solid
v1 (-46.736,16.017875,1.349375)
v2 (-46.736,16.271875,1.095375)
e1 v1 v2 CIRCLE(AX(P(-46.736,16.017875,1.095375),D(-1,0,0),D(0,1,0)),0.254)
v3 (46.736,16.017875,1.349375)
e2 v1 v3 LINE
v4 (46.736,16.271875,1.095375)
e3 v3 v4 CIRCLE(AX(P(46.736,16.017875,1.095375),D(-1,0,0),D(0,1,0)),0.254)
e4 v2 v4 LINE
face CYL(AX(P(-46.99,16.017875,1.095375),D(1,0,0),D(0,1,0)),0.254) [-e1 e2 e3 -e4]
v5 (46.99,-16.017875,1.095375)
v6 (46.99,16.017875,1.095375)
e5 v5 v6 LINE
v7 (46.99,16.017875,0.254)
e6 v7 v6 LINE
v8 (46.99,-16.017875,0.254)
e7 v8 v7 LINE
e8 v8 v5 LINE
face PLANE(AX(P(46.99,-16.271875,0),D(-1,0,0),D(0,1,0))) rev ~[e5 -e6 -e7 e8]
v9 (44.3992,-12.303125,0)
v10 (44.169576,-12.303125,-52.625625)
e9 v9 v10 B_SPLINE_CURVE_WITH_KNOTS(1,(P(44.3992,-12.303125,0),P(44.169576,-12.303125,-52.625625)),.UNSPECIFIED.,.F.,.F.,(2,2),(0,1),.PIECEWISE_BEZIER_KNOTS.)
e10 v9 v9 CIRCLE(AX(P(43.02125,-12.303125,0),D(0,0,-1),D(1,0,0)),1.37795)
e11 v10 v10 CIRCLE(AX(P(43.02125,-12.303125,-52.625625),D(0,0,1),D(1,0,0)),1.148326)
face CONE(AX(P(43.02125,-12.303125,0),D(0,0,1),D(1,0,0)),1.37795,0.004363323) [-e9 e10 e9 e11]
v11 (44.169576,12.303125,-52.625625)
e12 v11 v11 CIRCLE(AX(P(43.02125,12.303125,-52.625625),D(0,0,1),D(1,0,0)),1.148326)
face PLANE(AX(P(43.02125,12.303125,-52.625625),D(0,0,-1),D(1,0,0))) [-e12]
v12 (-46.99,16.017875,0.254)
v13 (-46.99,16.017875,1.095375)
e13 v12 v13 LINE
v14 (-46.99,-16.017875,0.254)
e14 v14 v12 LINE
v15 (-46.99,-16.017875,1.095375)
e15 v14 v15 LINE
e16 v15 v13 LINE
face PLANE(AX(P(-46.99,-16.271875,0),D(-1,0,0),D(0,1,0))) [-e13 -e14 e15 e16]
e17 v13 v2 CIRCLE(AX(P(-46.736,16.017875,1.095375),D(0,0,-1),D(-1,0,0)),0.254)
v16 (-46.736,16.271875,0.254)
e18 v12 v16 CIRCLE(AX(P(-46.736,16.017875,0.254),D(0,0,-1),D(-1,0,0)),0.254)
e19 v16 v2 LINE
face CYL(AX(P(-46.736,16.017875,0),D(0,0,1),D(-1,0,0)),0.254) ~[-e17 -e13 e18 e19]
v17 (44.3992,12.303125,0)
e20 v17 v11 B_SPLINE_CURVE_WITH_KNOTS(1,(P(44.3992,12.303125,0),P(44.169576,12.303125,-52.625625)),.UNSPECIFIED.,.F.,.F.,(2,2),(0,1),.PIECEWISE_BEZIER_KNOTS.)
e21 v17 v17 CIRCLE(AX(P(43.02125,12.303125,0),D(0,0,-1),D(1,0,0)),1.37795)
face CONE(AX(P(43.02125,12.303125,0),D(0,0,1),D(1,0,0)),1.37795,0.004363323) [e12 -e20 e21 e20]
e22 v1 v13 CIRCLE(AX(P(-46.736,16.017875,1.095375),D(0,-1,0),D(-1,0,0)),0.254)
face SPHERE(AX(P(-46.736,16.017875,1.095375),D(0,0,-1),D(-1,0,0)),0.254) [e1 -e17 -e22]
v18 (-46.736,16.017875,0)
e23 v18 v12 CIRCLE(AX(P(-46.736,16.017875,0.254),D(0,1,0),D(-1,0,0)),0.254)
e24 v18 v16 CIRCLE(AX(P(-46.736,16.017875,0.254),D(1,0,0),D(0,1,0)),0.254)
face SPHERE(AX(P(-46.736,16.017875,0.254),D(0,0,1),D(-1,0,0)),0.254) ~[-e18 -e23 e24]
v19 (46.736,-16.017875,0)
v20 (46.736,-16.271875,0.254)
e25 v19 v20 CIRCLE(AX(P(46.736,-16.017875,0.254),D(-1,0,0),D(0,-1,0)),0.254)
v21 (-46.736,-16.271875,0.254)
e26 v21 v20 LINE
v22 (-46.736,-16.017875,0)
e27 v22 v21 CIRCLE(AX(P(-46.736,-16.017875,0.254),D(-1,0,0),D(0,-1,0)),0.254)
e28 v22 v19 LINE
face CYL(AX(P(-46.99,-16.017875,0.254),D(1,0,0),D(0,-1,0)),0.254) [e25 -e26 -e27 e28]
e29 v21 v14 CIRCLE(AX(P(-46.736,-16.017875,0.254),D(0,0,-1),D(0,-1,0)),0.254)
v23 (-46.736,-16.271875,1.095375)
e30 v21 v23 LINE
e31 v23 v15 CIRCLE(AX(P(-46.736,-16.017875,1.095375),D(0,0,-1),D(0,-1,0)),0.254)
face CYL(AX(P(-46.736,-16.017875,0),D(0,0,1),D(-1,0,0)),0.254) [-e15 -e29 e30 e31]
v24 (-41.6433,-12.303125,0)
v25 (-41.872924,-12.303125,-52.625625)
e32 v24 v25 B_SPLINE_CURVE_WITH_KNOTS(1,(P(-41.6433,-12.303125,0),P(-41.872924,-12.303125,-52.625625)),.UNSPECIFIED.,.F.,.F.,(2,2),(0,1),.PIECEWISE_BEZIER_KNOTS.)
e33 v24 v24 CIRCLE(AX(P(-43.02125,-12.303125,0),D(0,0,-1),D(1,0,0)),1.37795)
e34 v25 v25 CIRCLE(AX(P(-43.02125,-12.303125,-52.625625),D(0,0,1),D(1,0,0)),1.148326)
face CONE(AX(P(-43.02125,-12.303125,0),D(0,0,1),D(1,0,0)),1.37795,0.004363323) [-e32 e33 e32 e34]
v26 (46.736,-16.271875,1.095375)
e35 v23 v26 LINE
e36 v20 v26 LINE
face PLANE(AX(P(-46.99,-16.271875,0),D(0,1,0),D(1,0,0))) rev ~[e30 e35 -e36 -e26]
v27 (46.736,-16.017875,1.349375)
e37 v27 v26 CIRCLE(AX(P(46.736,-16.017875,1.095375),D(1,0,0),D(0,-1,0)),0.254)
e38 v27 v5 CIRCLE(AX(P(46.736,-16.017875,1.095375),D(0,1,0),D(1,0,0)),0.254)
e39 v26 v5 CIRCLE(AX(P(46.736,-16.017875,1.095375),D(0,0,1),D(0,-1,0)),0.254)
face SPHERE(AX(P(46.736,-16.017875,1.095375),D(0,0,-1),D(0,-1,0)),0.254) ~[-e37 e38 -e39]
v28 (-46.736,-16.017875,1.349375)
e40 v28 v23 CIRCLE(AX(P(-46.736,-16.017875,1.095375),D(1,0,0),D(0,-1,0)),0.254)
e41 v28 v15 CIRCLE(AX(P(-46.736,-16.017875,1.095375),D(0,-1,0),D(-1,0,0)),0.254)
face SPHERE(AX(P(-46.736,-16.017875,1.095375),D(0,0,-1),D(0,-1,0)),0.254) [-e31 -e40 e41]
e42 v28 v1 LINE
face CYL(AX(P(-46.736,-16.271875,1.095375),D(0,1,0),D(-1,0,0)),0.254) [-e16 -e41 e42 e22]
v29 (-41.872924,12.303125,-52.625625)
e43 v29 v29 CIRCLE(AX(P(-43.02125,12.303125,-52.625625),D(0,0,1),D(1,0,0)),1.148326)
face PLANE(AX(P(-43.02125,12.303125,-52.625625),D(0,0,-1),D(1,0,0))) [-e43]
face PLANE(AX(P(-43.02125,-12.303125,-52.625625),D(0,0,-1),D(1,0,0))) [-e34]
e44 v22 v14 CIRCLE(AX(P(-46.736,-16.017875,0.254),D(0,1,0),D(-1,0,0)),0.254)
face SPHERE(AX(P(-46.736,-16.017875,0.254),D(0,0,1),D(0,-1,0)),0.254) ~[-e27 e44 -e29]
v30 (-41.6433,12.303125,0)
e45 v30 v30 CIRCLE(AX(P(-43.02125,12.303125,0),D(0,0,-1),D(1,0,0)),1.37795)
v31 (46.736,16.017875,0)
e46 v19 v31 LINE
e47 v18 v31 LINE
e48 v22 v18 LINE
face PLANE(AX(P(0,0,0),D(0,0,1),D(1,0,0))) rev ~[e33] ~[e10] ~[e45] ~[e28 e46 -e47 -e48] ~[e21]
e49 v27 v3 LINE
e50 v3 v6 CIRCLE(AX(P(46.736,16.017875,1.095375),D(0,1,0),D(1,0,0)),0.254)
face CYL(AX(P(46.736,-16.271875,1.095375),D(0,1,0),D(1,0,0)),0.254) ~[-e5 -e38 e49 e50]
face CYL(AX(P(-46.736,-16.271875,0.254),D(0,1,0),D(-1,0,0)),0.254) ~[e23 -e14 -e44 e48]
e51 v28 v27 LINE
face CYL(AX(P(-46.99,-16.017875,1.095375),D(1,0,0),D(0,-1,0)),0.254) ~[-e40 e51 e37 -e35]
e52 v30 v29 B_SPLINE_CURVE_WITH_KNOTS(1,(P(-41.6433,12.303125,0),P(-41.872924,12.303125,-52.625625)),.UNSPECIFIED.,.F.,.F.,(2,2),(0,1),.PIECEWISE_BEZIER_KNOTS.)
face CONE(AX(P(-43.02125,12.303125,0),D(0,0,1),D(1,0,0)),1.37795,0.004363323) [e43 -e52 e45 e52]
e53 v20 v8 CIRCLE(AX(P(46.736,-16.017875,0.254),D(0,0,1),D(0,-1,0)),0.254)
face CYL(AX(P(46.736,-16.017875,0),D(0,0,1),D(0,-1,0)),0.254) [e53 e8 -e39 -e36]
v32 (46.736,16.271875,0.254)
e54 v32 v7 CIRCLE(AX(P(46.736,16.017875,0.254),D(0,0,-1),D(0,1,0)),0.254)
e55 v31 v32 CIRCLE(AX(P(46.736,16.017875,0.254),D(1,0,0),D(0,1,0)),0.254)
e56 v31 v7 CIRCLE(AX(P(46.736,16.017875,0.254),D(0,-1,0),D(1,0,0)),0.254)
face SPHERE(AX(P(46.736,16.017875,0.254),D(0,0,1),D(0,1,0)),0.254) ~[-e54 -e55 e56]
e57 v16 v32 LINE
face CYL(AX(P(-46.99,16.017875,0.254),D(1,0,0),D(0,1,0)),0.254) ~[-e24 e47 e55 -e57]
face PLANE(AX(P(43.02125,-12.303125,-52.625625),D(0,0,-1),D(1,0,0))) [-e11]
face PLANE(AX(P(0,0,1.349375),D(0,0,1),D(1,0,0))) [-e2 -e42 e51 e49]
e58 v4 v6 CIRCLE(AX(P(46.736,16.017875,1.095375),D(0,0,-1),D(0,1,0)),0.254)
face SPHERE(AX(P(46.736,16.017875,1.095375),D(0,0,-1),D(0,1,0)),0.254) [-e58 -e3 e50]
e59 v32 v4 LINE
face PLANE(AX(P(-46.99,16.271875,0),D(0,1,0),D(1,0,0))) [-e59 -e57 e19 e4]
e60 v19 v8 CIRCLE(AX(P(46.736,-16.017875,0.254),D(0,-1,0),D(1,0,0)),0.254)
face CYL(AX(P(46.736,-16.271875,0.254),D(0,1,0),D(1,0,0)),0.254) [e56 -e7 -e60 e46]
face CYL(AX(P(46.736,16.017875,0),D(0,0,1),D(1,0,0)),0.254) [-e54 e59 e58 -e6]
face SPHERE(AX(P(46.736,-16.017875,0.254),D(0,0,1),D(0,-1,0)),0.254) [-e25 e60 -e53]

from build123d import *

# Parameters (mm, degrees)
F0_W     = 1879.6
F0_H     = 650.875
F1_DEPTH = 26.9875
F2_R     = 5.08
F3_R     = 27.559
F4_DEPTH = 1052.5125
F4_TAPER = 0.25
F5_SCALE = 0.05


with BuildPart() as f1:
    # F0 (on Top) → F1 (new body)
    with BuildSketch(Plane.XY):
        Rectangle(F0_W, F0_H)
    extrude(amount=F1_DEPTH)

    # F2
    f2_edges = [f1.edges().sort_by_distance(p)[0] for p in [
        (-939.8, 325.4375, 13.49375),
        (-939.8, -325.4375, 13.49375),
        (939.8, -325.4375, 13.49375),
        (0, -325.4375, 0),
        (0, -325.4375, 26.9875),
        (-939.8, 0, 0),
        (-939.8, 0, 26.9875),
        (939.8, 325.4375, 13.49375),
        (0, 325.4375, 0),
        (0, 325.4375, 26.9875),
        (939.8, 0, 0),
        (939.8, 0, 26.9875),
    ]]
    fillet(f2_edges, radius=F2_R)

    # F3 (on face) → F4 (join)
    with BuildSketch(Plane(origin=(0, 0, 0), x_dir=(1, 0, 0), z_dir=(0, 0, -1))):
        with Locations((-860.425, 246.0625)):
            Circle(F3_R)
        with Locations((-860.425, -246.0625)):
            Circle(F3_R)
        with Locations((860.425, 246.0625)):
            Circle(F3_R)
        with Locations((860.425, -246.0625)):
            Circle(F3_R)
    extrude(amount=F4_DEPTH, taper=F4_TAPER)


with BuildPart() as f1_1:
    # F5: moved
    add(f1.part.scale(F5_SCALE))


solid = f1_1.part
